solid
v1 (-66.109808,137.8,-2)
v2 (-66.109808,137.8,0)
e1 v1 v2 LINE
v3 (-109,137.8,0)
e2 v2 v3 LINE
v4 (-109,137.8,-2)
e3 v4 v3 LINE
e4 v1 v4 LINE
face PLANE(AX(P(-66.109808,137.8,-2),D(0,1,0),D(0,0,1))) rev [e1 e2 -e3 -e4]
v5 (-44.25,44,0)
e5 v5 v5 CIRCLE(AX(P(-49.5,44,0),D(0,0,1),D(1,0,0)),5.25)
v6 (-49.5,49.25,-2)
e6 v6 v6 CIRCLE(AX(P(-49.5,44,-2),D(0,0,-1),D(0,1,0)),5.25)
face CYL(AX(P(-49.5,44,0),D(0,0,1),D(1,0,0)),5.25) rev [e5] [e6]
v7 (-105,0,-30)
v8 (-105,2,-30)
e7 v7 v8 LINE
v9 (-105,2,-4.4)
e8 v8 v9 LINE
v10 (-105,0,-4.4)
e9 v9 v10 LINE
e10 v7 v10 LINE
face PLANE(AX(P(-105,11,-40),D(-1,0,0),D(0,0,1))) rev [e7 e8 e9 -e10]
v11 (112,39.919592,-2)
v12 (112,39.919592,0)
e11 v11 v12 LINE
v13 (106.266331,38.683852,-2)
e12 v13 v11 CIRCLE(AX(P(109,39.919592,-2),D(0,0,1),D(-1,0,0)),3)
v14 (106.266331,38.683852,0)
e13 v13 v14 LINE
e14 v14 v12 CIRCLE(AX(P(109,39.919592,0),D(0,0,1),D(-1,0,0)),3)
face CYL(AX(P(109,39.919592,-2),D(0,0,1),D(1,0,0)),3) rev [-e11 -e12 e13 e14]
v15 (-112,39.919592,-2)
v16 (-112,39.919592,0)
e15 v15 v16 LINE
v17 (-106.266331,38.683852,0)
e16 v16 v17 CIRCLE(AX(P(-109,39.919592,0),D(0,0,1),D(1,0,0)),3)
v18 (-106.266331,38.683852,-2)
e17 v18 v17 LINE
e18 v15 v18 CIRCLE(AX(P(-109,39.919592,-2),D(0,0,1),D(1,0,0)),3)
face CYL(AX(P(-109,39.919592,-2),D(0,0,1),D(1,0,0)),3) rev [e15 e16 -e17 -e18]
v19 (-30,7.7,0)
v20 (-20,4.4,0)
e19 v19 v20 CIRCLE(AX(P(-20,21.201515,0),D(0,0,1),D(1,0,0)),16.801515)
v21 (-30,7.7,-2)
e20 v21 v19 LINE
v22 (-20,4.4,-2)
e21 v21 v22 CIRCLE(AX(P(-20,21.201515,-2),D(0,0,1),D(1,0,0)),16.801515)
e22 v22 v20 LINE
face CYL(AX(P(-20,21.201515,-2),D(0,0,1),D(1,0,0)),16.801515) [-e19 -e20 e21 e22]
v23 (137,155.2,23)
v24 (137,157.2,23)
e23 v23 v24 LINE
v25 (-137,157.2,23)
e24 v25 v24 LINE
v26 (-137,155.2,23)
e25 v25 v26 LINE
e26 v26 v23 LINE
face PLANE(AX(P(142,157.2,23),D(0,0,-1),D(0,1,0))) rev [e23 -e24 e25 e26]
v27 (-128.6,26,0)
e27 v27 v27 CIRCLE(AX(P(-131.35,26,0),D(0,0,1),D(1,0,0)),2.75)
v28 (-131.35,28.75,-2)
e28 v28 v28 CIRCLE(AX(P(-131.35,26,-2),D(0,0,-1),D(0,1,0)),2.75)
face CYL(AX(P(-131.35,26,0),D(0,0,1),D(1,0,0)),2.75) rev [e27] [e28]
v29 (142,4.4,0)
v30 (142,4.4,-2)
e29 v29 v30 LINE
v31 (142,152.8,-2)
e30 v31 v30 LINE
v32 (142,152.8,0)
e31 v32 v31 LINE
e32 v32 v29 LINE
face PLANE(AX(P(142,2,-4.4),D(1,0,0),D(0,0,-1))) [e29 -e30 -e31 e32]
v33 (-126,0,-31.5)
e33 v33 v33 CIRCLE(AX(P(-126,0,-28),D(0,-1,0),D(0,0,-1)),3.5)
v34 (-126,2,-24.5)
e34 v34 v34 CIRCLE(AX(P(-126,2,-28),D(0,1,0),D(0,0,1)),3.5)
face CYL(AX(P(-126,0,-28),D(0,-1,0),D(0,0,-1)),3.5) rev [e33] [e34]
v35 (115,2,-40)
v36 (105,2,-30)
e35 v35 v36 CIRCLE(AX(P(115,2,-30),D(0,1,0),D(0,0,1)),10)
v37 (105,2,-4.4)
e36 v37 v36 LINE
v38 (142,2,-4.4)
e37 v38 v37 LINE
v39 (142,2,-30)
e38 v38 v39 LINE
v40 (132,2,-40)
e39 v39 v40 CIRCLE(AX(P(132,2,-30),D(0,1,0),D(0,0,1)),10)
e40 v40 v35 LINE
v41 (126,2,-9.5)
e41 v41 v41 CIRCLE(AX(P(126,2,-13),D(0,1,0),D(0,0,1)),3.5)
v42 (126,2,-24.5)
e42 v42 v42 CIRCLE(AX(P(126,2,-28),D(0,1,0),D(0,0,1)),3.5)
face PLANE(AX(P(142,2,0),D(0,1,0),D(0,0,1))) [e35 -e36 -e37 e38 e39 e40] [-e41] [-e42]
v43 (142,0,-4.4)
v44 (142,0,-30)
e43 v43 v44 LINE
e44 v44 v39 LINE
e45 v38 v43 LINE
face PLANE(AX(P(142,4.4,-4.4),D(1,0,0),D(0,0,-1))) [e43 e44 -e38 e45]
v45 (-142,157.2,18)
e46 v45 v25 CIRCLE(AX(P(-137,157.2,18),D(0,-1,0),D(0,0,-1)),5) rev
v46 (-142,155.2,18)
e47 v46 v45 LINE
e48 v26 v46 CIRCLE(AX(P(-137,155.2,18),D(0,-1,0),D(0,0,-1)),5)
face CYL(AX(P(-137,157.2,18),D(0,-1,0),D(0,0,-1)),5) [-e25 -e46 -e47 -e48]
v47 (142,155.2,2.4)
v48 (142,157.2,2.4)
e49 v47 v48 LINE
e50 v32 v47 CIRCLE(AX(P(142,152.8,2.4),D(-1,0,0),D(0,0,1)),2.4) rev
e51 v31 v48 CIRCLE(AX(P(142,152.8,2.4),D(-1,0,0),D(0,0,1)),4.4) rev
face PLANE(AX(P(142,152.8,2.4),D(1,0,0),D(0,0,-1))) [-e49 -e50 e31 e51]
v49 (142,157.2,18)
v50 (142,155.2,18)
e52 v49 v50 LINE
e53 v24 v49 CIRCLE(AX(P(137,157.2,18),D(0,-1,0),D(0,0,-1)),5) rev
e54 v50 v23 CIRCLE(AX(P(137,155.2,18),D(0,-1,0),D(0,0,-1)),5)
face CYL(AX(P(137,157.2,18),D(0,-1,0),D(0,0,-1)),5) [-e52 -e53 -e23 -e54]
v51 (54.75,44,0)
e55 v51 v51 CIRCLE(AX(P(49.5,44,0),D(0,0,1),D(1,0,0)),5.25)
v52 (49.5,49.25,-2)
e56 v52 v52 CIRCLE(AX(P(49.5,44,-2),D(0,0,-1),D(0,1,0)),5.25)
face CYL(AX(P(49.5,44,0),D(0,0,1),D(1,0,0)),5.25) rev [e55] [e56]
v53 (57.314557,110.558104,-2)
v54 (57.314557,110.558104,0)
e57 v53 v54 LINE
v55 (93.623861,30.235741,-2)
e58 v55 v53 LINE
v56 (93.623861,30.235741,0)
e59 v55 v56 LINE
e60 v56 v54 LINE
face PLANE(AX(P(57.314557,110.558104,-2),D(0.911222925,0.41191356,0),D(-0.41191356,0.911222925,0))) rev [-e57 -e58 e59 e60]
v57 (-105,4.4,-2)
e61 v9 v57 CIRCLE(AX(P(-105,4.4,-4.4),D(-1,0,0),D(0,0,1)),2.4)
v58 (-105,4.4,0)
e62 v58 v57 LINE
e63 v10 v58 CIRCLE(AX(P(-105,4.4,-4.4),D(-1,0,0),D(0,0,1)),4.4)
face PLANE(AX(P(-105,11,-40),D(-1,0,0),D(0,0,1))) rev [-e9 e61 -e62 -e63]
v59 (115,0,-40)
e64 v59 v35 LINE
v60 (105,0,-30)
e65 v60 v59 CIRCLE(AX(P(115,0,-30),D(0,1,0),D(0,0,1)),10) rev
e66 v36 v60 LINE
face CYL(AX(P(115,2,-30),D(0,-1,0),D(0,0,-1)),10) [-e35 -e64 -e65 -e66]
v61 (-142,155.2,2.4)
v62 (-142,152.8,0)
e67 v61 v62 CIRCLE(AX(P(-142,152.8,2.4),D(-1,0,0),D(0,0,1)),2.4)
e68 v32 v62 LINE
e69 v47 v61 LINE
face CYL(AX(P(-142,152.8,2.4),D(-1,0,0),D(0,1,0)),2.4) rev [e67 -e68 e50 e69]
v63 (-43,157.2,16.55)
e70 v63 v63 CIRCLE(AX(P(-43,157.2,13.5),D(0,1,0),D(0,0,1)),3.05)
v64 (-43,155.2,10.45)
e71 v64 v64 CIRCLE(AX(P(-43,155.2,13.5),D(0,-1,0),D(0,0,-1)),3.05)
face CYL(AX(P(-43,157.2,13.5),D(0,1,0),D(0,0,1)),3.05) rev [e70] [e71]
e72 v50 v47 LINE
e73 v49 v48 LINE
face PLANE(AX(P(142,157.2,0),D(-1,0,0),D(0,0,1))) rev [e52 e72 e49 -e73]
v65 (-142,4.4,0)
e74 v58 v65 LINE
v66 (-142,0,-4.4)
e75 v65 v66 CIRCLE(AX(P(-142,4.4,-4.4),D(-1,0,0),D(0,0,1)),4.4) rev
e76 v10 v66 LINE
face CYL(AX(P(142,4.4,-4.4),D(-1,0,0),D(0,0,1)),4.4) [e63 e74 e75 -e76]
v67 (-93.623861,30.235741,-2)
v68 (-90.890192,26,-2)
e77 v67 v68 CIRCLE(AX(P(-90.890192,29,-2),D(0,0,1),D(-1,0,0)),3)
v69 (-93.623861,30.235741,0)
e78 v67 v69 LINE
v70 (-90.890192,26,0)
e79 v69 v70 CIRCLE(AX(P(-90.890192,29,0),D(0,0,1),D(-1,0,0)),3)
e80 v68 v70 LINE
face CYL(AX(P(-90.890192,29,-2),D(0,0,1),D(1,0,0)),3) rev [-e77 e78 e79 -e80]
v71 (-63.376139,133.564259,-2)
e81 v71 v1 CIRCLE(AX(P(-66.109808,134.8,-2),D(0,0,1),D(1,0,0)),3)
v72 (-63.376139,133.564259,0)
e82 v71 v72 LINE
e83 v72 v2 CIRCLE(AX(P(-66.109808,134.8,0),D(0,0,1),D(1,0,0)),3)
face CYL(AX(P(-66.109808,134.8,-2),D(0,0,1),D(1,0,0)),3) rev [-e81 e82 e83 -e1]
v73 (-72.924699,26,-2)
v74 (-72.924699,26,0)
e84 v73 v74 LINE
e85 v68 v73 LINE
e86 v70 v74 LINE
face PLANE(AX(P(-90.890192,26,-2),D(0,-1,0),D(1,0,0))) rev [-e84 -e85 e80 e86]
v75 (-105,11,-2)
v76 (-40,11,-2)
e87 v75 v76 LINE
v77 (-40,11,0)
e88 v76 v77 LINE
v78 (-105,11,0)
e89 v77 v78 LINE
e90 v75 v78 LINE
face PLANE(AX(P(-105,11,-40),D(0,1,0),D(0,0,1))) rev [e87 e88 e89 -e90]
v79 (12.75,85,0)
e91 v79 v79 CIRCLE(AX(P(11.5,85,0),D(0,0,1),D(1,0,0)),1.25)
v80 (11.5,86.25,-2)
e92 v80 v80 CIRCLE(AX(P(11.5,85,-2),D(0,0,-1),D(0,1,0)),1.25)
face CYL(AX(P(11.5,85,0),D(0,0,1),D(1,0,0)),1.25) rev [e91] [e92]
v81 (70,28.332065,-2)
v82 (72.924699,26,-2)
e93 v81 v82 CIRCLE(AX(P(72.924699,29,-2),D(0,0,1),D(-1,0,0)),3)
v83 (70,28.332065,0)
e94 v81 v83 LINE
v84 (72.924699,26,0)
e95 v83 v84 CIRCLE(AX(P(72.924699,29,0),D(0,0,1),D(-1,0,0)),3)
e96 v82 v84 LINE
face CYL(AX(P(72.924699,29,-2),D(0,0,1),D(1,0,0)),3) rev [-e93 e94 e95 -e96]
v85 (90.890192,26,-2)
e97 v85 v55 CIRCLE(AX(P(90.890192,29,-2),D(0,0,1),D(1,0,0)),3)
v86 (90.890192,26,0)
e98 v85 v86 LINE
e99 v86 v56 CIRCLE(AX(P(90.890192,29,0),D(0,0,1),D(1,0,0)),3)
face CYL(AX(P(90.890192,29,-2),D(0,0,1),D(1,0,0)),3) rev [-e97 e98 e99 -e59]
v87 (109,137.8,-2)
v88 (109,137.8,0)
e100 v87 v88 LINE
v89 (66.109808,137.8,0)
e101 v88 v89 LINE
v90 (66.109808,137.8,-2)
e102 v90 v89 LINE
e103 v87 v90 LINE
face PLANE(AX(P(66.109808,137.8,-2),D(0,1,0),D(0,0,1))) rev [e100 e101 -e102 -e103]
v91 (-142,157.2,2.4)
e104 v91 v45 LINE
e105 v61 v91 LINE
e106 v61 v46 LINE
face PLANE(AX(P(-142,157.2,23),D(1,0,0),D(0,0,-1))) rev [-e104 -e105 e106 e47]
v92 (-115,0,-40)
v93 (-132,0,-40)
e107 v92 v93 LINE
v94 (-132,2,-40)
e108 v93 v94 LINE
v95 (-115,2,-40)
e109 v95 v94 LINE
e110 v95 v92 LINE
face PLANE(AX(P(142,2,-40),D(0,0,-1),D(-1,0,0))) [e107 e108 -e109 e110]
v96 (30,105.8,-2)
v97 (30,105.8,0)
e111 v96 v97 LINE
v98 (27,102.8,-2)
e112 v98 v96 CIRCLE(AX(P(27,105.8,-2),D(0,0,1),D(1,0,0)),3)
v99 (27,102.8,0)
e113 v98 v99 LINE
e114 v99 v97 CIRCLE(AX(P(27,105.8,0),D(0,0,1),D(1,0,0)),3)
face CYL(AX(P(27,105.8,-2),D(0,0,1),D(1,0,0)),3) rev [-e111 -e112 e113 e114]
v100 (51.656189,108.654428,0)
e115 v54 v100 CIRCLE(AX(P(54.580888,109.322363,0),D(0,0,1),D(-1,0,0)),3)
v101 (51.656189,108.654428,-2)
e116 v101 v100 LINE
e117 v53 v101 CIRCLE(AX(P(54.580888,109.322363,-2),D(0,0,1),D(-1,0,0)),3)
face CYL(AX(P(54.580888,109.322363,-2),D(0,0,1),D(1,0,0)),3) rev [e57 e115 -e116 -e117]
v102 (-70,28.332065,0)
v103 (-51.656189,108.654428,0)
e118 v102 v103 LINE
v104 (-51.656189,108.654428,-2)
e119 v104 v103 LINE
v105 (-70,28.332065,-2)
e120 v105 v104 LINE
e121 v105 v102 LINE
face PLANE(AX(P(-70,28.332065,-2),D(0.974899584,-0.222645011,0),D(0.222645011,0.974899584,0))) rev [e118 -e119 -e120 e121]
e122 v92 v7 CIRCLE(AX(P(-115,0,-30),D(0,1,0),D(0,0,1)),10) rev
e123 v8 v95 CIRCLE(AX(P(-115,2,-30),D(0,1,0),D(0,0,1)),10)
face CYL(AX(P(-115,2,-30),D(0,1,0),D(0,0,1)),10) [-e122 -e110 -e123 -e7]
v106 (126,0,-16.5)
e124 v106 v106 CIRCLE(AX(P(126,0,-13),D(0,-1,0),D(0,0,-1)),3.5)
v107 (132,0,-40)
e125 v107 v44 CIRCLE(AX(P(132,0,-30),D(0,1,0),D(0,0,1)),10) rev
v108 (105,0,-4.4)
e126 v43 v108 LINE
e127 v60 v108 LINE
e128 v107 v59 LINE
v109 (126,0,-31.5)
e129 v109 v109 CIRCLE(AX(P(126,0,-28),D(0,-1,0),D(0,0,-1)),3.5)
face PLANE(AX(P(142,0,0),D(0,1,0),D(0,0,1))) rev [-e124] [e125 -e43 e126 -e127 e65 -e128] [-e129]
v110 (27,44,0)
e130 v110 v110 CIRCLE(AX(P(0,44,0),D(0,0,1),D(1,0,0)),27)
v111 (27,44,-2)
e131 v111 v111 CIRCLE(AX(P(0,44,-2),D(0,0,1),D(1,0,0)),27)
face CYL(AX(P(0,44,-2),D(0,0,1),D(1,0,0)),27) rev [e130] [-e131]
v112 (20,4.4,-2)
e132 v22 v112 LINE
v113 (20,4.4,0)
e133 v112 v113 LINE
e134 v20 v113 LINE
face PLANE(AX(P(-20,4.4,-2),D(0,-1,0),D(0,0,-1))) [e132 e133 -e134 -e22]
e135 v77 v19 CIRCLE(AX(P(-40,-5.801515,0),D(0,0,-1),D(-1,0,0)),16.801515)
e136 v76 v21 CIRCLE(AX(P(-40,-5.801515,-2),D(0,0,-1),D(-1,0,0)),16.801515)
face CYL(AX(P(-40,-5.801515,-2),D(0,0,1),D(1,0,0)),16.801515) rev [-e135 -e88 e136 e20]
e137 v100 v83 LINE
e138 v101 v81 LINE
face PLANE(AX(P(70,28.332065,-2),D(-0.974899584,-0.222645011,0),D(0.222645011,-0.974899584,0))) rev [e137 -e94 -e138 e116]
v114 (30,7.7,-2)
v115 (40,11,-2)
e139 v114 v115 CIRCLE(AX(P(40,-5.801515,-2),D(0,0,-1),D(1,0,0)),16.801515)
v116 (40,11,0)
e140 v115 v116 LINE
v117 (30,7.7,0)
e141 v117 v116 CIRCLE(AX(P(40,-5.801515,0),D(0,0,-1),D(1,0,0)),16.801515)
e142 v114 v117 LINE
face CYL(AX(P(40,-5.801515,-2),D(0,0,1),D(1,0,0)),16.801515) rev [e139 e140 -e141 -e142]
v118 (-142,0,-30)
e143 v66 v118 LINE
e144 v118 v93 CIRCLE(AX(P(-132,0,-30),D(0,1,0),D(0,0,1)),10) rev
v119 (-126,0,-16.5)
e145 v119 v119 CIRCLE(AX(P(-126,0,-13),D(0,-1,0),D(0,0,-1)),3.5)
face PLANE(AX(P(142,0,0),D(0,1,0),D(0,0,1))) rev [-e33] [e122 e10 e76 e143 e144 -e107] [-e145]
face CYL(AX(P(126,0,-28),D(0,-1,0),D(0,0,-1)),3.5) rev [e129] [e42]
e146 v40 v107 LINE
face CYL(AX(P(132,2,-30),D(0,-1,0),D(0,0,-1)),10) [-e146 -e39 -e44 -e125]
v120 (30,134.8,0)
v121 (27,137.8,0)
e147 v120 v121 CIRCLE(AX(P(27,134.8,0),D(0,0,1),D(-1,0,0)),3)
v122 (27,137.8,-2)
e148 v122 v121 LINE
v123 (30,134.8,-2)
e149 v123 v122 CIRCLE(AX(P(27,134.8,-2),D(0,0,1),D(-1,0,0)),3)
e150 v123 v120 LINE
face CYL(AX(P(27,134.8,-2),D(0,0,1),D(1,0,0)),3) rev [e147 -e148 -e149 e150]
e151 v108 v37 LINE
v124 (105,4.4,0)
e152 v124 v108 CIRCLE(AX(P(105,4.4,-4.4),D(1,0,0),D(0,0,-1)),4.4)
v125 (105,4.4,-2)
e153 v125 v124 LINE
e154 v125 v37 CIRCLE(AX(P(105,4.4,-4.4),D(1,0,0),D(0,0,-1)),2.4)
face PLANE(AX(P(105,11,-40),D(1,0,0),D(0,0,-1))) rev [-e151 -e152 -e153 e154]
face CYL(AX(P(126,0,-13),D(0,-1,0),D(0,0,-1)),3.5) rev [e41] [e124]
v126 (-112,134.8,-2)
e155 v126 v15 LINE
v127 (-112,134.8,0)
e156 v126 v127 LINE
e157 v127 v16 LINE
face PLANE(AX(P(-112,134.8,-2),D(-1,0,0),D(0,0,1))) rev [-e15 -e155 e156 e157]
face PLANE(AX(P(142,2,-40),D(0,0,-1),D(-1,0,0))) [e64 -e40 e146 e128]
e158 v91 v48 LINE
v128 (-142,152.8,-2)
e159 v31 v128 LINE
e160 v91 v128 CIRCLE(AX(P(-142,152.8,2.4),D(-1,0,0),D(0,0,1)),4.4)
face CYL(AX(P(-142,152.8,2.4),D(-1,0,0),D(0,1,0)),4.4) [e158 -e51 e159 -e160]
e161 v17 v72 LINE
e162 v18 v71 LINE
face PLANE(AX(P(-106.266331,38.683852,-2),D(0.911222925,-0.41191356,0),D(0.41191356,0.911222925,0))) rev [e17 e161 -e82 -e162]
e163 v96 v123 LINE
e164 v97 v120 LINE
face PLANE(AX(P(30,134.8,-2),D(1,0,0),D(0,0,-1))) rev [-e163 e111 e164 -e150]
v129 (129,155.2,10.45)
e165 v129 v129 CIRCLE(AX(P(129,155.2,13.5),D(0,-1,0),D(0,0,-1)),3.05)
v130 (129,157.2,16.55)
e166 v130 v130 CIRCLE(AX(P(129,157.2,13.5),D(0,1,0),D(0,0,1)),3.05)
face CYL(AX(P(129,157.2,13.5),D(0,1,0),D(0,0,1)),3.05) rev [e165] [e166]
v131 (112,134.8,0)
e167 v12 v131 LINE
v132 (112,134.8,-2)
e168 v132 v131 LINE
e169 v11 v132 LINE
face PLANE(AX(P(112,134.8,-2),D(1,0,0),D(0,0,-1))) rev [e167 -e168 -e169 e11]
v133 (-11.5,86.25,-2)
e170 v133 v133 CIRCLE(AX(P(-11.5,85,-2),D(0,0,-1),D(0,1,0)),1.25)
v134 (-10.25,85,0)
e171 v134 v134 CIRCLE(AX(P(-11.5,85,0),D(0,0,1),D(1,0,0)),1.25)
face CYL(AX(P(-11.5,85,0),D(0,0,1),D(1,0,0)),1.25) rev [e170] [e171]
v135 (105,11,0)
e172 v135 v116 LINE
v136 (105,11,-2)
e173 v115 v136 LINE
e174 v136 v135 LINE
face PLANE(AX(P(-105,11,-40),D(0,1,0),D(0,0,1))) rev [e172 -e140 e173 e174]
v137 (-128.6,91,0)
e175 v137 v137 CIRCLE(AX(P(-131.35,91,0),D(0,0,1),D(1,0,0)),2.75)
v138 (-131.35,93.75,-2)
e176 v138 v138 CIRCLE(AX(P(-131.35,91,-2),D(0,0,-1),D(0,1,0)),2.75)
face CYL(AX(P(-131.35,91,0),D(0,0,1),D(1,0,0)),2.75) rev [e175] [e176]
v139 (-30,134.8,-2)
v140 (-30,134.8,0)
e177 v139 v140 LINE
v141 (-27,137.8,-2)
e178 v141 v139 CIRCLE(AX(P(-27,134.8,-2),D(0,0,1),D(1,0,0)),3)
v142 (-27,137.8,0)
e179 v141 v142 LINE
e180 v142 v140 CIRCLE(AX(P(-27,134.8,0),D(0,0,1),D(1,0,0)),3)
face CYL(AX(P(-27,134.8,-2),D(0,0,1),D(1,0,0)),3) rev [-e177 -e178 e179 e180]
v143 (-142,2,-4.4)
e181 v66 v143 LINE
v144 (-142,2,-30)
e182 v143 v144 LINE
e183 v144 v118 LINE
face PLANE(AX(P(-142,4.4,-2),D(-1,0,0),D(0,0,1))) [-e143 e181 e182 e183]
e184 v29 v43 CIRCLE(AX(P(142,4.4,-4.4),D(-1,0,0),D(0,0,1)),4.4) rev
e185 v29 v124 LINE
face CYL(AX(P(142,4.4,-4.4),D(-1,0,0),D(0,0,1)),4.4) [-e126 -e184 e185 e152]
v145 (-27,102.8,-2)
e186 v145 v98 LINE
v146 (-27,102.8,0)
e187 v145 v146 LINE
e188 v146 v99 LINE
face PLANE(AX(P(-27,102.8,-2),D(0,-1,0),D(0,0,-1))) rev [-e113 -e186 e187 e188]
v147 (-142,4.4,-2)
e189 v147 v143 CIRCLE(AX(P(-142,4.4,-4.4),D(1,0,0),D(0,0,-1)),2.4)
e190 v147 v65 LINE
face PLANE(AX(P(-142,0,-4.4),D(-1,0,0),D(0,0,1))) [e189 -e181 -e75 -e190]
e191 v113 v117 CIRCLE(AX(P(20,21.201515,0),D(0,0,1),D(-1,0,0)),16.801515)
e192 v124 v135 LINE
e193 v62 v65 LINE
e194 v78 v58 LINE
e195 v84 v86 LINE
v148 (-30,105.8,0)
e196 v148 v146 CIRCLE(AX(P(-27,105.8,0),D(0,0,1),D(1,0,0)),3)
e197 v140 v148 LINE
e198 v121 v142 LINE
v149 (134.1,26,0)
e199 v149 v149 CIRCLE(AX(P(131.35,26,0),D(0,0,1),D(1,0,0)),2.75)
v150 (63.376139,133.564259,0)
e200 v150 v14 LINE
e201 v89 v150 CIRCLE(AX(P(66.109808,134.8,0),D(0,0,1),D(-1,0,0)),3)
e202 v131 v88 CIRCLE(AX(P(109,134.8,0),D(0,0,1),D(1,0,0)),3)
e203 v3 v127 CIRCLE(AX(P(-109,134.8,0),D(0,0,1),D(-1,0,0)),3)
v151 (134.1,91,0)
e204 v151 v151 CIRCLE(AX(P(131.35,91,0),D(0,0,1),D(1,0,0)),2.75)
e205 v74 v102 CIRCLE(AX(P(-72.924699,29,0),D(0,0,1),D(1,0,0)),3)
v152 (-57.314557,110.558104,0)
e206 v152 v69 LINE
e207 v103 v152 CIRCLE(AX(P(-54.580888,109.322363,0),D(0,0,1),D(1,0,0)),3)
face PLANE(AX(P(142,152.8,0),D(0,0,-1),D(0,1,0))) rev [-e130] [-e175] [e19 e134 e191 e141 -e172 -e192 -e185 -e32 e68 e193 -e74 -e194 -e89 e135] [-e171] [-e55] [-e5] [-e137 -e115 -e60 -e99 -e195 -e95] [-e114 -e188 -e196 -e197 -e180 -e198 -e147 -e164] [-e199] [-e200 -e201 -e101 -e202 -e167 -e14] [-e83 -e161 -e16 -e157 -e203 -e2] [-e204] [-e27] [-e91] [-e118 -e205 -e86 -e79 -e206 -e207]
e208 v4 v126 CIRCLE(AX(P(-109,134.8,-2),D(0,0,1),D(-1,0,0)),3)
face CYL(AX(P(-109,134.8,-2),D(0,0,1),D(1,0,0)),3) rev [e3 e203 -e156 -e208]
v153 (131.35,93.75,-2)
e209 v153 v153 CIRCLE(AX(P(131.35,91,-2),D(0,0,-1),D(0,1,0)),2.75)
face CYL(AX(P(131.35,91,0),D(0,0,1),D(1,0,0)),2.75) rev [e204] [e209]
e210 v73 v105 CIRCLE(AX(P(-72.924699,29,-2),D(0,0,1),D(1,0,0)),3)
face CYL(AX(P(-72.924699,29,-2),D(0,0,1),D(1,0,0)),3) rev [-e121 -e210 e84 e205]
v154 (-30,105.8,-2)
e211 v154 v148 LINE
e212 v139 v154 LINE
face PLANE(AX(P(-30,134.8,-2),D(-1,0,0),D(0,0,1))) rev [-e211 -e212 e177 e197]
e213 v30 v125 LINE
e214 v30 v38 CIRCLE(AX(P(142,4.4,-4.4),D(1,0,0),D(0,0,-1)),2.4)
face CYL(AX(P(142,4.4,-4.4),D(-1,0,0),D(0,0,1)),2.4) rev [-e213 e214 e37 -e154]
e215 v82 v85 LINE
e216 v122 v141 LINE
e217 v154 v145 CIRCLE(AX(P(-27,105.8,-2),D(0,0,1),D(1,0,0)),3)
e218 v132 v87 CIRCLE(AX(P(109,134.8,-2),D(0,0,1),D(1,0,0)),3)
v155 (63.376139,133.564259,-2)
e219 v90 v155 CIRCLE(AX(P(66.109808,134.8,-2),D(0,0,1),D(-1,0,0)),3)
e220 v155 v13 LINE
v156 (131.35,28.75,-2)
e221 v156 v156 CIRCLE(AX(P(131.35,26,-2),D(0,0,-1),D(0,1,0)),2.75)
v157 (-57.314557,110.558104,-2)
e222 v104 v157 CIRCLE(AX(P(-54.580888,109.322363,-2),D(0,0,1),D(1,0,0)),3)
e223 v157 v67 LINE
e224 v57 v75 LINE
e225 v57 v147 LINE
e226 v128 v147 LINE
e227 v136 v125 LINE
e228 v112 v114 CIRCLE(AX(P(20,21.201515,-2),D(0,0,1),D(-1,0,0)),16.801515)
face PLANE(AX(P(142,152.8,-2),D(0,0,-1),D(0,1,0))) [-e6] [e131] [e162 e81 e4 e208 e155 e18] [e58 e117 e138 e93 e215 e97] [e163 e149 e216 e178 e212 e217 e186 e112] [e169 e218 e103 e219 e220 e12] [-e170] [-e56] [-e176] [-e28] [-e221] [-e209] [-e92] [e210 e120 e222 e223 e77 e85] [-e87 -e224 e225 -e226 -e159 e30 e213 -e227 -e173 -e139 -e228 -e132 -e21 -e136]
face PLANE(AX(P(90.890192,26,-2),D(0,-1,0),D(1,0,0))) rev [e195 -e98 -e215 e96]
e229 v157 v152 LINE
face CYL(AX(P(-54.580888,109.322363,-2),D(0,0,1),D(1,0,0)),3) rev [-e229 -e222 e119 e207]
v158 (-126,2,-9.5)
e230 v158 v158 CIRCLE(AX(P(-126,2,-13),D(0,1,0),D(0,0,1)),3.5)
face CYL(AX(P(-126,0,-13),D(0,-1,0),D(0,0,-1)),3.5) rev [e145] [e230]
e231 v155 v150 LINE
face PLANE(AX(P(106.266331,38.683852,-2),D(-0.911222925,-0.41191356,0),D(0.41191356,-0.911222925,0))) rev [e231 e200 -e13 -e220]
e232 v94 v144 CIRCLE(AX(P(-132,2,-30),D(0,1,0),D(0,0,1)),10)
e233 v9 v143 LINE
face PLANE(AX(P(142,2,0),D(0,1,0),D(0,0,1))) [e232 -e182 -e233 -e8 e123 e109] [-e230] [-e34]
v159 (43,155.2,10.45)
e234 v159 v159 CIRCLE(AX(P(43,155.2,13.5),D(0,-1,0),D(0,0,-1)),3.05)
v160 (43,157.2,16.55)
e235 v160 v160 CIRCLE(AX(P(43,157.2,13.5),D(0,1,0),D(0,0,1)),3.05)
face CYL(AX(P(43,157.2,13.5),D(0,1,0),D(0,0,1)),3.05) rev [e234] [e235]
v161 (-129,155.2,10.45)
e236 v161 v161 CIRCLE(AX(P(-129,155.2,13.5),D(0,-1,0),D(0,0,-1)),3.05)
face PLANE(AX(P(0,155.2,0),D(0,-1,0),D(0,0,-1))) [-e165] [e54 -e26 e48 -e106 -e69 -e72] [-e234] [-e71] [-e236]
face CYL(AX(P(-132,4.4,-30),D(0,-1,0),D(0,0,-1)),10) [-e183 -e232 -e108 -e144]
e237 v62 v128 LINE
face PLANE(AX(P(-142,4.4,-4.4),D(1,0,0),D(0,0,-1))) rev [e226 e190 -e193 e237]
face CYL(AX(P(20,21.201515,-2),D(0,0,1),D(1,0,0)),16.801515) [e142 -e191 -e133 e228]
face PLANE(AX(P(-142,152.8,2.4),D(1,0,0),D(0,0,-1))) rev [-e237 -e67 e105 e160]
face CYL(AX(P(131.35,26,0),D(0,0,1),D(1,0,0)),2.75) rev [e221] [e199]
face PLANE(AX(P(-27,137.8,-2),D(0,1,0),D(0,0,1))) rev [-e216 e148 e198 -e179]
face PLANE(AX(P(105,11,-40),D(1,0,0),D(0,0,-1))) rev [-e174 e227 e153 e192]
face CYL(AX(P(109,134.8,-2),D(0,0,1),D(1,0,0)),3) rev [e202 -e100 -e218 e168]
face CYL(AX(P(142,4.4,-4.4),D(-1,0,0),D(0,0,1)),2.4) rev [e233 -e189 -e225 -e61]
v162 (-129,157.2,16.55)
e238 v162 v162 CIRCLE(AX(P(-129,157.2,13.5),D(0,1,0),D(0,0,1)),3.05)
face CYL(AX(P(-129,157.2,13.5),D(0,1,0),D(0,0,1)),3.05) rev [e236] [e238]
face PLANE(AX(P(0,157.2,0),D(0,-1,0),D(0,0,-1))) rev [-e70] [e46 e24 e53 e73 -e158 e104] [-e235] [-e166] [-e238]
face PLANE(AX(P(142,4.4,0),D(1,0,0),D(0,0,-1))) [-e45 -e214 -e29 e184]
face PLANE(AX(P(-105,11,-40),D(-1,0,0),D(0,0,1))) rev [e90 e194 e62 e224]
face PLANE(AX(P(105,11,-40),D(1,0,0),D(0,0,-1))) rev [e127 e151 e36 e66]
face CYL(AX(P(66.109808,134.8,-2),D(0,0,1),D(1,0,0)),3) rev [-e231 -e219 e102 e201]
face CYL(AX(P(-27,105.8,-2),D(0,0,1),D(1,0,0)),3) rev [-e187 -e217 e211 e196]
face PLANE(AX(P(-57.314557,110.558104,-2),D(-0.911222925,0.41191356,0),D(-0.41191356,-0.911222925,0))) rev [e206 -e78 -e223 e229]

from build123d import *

# Parameters (mm, degrees)
SM_START                     = -142
SM_BASE_FLANGE_1_DEPTH       = 284
SKETCH_6_R                   = 27
CUT_EXTRUDE_1_DEPTH          = 10
HOLE_WIZARD_5_5_5_5_1_D      = 5.5
HOLE_WIZARD_5_5_5_5_1_DEPTH  = 14
HOLE_WIZARD_5_5_5_5_1_TIP    = 1.652366702
HOLE_WIZARD_7_0_7_1_D        = 7
SKETCH_21_W                  = 210
SKETCH_21_H                  = 11
CUT_EXTRUDE_4_DEPTH          = 213.395480178
FILLET_1_R                   = 10
HOLE_WIZARD_M31_D            = 2.5
HOLE_WIZARD_M31_DEPTH        = 8.5
HOLE_WIZARD_M31_TIP          = 0.751075774
SM_EDGE_FLANGE_1_DEPTH       = 284
FILLET_3_R                   = 5
EXTRUDE_1_DEPTH              = 2
CUT_EXTRUDE_5_DEPTH          = 10
HOLE_WIZARD_6_1_6_1_1_D      = 6.1
HOLE_WIZARD_6_1_6_1_1_DEPTH  = 7.25
HOLE_WIZARD_6_1_6_1_1_TIP    = 1.832624888
F_10_5_10_5_DIAMETER_HOLE1_D = 10.5


# Read off the part's stored shape, not the designer's step: Базовая кромка1
# Sheet-metal steps are written as plain solids
with BuildPart() as part:
    # Базовая кромка1 outline → Базовая кромка1 (new body)
    with BuildSketch(Plane(origin=(0, 0, 0), x_dir=(0, 0, -1), z_dir=(1, 0, 0)).offset(SM_START)):
        with BuildLine():
            Line((4.4, 0), (40, 0))
            Line((40, 0), (40, 2))
            Line((40, 2), (4.4, 2))
            ThreePointArc((4.4, 2), (2.702943725, 2.702943725), (2, 4.4))
            Line((2, 4.4), (2, 152.8))
            Line((2, 152.8), (0, 152.8))
            Line((0, 152.8), (0, 4.4))
            ThreePointArc((0, 4.4), (1.288730163, 1.288730163), (4.4, 0))
        make_face()
    extrude(amount=SM_BASE_FLANGE_1_DEPTH)

    # Эскиз6 → Вырез-Вытянуть1 (cut)
    with BuildSketch(Plane.XY):
        with Locations((0, 44)):
            Circle(SKETCH_6_R)
    extrude(amount=-CUT_EXTRUDE_1_DEPTH, mode=Mode.SUBTRACT)

    # Диаметр отверстия Ø5.5 (5.5)1
    with Locations(Plane.XY):
        with Locations((131.35, 91), (-131.35, 91), (-131.35, 26), (131.35, 26)):
            Hole(HOLE_WIZARD_5_5_5_5_1_D / 2, depth=HOLE_WIZARD_5_5_5_5_1_DEPTH)
            with Locations((0, 0, -(HOLE_WIZARD_5_5_5_5_1_DEPTH + HOLE_WIZARD_5_5_5_5_1_TIP / 2))):  # 118° drill point
                Cone(0, HOLE_WIZARD_5_5_5_5_1_D / 2, HOLE_WIZARD_5_5_5_5_1_TIP, mode=Mode.SUBTRACT)

    # Диаметр отверстия Ø7.0 (7)1 (through all)
    with Locations(Plane(origin=(0, 0, 0), x_dir=(-1, 0, 0), z_dir=(0, -1, 0))):
        with Locations((126, 28), (126, 13), (-126, 13), (-126, 28)):
            Hole(HOLE_WIZARD_7_0_7_1_D / 2)

    # Эскиз21 → Вырез-Вытянуть4 (cut, through all)
    with BuildSketch(Plane.XY):
        with Locations((0, 5.5)):
            Rectangle(SKETCH_21_W, SKETCH_21_H)
    extrude(amount=-CUT_EXTRUDE_4_DEPTH, mode=Mode.SUBTRACT)

    # Скругление1
    fillet_1_edges = [part.edges().sort_by_distance(p)[0] for p in [
        (-105, 1, -40),
        (105, 1, -40),
        (142, 1, -40),
        (-142, 1, -40),
    ]]
    fillet(fillet_1_edges, radius=FILLET_1_R)

    # Отверстие обработанное метчиком M31
    with Locations(Plane.XY):
        with Locations((-11.5, 85), (11.5, 85)):
            Hole(HOLE_WIZARD_M31_D / 2, depth=HOLE_WIZARD_M31_DEPTH)
            with Locations((0, 0, -(HOLE_WIZARD_M31_DEPTH + HOLE_WIZARD_M31_TIP / 2))):  # 118° drill point
                Cone(0, HOLE_WIZARD_M31_D / 2, HOLE_WIZARD_M31_TIP, mode=Mode.SUBTRACT)

    # Ребро-кромка1 section (across the edge) → Ребро-кромка1 (add)
    with BuildSketch(Plane(origin=(142, 155.2, 0), x_dir=(0, -1, 0), z_dir=(-1, 0, 0))):
        with BuildLine():
            Line((-2, 2.4), (-2, 23))
            Line((-2, 23), (0, 23))
            Line((0, 23), (0, 2.4))
            ThreePointArc((0, 2.4), (0.702943725, 0.702943725), (2.4, 0))
            Line((2.4, 0), (2.4, -2))
            ThreePointArc((2.4, -2), (-0.711269837, -0.711269837), (-2, 2.4))
        make_face()
    extrude(amount=SM_EDGE_FLANGE_1_DEPTH)

    # Скругление3
    fillet_3_edges = [part.edges().sort_by_distance(p)[0] for p in [
        (142, 156.2, 23),
        (-142, 156.2, 23),
    ]]
    fillet(fillet_3_edges, radius=FILLET_3_R)

    # Эскиз27 → Бобышка-Вытянуть1 (add)
    with BuildSketch(Plane.XY):
        with BuildLine():
            Line((40, 11), (-40, 11))
            ThreePointArc((-40, 11), (-34.734783955, 10.153684985), (-30, 7.7))
            ThreePointArc((-30, 7.7), (-25.265216045, 5.246315015), (-20, 4.4))
            Line((-20, 4.4), (20, 4.4))
            ThreePointArc((20, 4.4), (25.265216045, 5.246315015), (30, 7.7))
            ThreePointArc((30, 7.7), (34.734783955, 10.153684985), (40, 11))
        make_face()
    extrude(amount=-EXTRUDE_1_DEPTH)

    # Эскиз28 → Вырез-Вытянуть5 (cut)
    with BuildSketch(Plane.XY):
        with BuildLine():
            Line((-112, 134.8), (-112, 39.919592204))
            ThreePointArc((-112, 39.919592204), (-109.632057622, 36.986930757), (-106.266331225, 38.683851525))
            Line((-106.266331225, 38.683851525), (-63.376138879, 133.564259321))
            ThreePointArc((-63.376138879, 133.564259321), (-63.589170628, 136.426772566), (-66.109807654, 137.8))
            Line((-66.109807654, 137.8), (-109, 137.8))
            ThreePointArc((-109, 137.8), (-111.121320344, 136.921320344), (-112, 134.8))
        make_face()
        with BuildLine():
            Line((-90.890192346, 26), (-72.924698752, 26))
            ThreePointArc((-72.924698752, 26), (-71.054378606, 26.65438653), (-70, 28.332064967))
            Line((-70, 28.332064967), (-51.656189361, 108.654427819))
            ThreePointArc((-51.656189361, 108.654427819), (-53.624269894, 112.16575547), (-57.314556889, 110.558103531))
            Line((-57.314556889, 110.558103531), (-93.623861121, 30.235740679))
            ThreePointArc((-93.623861121, 30.235740679), (-93.410829372, 27.373227434), (-90.890192346, 26))
        make_face()
        with BuildLine():
            Line((-27, 137.8), (27, 137.8))
            ThreePointArc((27, 137.8), (29.121320344, 136.921320344), (30, 134.8))
            Line((30, 134.8), (30, 105.8))
            ThreePointArc((30, 105.8), (29.121320344, 103.678679656), (27, 102.8))
            Line((27, 102.8), (-27, 102.8))
            ThreePointArc((-27, 102.8), (-29.121320344, 103.678679656), (-30, 105.8))
            Line((-30, 105.8), (-30, 134.8))
            ThreePointArc((-30, 134.8), (-29.121320344, 136.921320344), (-27, 137.8))
        make_face()
        with BuildLine():
            Line((70, 28.332064967), (51.656189361, 108.654427819))
            ThreePointArc((51.656189361, 108.654427819), (53.624269894, 112.16575547), (57.314556889, 110.558103531))
            Line((57.314556889, 110.558103531), (93.623861121, 30.235740679))
            ThreePointArc((93.623861121, 30.235740679), (93.410829372, 27.373227434), (90.890192346, 26))
            Line((90.890192346, 26), (72.924698752, 26))
            ThreePointArc((72.924698752, 26), (71.054378606, 26.65438653), (70, 28.332064967))
        make_face()
        with BuildLine():
            Line((112, 134.8), (112, 39.919592204))
            ThreePointArc((112, 39.919592204), (109.632057622, 36.986930757), (106.266331225, 38.683851525))
            Line((106.266331225, 38.683851525), (63.376138879, 133.564259321))
            ThreePointArc((63.376138879, 133.564259321), (63.589170628, 136.426772566), (66.109807654, 137.8))
            Line((66.109807654, 137.8), (109, 137.8))
            ThreePointArc((109, 137.8), (111.121320344, 136.921320344), (112, 134.8))
        make_face()
    extrude(amount=-CUT_EXTRUDE_5_DEPTH, mode=Mode.SUBTRACT)

    # Диаметр отверстия Ø6.1 (6.1)1
    with Locations(Plane(origin=(0, 157.2, 0), x_dir=(1, 0, 0), z_dir=(0, 1, 0))):
        with Locations((-129, -13.5), (-43, -13.5), (43, -13.5), (129, -13.5)):
            Hole(HOLE_WIZARD_6_1_6_1_1_D / 2, depth=HOLE_WIZARD_6_1_6_1_1_DEPTH)
            with Locations((0, 0, -(HOLE_WIZARD_6_1_6_1_1_DEPTH + HOLE_WIZARD_6_1_6_1_1_TIP / 2))):  # 118° drill point
                Cone(0, HOLE_WIZARD_6_1_6_1_1_D / 2, HOLE_WIZARD_6_1_6_1_1_TIP, mode=Mode.SUBTRACT)

    # Ø10.5 (10.5) Diameter Hole1 (through all)
    with Locations(Plane.XY):
        with Locations((-49.5, 44), (49.5, 44)):
            Hole(F_10_5_10_5_DIAMETER_HOLE1_D / 2)


solid = part.part
